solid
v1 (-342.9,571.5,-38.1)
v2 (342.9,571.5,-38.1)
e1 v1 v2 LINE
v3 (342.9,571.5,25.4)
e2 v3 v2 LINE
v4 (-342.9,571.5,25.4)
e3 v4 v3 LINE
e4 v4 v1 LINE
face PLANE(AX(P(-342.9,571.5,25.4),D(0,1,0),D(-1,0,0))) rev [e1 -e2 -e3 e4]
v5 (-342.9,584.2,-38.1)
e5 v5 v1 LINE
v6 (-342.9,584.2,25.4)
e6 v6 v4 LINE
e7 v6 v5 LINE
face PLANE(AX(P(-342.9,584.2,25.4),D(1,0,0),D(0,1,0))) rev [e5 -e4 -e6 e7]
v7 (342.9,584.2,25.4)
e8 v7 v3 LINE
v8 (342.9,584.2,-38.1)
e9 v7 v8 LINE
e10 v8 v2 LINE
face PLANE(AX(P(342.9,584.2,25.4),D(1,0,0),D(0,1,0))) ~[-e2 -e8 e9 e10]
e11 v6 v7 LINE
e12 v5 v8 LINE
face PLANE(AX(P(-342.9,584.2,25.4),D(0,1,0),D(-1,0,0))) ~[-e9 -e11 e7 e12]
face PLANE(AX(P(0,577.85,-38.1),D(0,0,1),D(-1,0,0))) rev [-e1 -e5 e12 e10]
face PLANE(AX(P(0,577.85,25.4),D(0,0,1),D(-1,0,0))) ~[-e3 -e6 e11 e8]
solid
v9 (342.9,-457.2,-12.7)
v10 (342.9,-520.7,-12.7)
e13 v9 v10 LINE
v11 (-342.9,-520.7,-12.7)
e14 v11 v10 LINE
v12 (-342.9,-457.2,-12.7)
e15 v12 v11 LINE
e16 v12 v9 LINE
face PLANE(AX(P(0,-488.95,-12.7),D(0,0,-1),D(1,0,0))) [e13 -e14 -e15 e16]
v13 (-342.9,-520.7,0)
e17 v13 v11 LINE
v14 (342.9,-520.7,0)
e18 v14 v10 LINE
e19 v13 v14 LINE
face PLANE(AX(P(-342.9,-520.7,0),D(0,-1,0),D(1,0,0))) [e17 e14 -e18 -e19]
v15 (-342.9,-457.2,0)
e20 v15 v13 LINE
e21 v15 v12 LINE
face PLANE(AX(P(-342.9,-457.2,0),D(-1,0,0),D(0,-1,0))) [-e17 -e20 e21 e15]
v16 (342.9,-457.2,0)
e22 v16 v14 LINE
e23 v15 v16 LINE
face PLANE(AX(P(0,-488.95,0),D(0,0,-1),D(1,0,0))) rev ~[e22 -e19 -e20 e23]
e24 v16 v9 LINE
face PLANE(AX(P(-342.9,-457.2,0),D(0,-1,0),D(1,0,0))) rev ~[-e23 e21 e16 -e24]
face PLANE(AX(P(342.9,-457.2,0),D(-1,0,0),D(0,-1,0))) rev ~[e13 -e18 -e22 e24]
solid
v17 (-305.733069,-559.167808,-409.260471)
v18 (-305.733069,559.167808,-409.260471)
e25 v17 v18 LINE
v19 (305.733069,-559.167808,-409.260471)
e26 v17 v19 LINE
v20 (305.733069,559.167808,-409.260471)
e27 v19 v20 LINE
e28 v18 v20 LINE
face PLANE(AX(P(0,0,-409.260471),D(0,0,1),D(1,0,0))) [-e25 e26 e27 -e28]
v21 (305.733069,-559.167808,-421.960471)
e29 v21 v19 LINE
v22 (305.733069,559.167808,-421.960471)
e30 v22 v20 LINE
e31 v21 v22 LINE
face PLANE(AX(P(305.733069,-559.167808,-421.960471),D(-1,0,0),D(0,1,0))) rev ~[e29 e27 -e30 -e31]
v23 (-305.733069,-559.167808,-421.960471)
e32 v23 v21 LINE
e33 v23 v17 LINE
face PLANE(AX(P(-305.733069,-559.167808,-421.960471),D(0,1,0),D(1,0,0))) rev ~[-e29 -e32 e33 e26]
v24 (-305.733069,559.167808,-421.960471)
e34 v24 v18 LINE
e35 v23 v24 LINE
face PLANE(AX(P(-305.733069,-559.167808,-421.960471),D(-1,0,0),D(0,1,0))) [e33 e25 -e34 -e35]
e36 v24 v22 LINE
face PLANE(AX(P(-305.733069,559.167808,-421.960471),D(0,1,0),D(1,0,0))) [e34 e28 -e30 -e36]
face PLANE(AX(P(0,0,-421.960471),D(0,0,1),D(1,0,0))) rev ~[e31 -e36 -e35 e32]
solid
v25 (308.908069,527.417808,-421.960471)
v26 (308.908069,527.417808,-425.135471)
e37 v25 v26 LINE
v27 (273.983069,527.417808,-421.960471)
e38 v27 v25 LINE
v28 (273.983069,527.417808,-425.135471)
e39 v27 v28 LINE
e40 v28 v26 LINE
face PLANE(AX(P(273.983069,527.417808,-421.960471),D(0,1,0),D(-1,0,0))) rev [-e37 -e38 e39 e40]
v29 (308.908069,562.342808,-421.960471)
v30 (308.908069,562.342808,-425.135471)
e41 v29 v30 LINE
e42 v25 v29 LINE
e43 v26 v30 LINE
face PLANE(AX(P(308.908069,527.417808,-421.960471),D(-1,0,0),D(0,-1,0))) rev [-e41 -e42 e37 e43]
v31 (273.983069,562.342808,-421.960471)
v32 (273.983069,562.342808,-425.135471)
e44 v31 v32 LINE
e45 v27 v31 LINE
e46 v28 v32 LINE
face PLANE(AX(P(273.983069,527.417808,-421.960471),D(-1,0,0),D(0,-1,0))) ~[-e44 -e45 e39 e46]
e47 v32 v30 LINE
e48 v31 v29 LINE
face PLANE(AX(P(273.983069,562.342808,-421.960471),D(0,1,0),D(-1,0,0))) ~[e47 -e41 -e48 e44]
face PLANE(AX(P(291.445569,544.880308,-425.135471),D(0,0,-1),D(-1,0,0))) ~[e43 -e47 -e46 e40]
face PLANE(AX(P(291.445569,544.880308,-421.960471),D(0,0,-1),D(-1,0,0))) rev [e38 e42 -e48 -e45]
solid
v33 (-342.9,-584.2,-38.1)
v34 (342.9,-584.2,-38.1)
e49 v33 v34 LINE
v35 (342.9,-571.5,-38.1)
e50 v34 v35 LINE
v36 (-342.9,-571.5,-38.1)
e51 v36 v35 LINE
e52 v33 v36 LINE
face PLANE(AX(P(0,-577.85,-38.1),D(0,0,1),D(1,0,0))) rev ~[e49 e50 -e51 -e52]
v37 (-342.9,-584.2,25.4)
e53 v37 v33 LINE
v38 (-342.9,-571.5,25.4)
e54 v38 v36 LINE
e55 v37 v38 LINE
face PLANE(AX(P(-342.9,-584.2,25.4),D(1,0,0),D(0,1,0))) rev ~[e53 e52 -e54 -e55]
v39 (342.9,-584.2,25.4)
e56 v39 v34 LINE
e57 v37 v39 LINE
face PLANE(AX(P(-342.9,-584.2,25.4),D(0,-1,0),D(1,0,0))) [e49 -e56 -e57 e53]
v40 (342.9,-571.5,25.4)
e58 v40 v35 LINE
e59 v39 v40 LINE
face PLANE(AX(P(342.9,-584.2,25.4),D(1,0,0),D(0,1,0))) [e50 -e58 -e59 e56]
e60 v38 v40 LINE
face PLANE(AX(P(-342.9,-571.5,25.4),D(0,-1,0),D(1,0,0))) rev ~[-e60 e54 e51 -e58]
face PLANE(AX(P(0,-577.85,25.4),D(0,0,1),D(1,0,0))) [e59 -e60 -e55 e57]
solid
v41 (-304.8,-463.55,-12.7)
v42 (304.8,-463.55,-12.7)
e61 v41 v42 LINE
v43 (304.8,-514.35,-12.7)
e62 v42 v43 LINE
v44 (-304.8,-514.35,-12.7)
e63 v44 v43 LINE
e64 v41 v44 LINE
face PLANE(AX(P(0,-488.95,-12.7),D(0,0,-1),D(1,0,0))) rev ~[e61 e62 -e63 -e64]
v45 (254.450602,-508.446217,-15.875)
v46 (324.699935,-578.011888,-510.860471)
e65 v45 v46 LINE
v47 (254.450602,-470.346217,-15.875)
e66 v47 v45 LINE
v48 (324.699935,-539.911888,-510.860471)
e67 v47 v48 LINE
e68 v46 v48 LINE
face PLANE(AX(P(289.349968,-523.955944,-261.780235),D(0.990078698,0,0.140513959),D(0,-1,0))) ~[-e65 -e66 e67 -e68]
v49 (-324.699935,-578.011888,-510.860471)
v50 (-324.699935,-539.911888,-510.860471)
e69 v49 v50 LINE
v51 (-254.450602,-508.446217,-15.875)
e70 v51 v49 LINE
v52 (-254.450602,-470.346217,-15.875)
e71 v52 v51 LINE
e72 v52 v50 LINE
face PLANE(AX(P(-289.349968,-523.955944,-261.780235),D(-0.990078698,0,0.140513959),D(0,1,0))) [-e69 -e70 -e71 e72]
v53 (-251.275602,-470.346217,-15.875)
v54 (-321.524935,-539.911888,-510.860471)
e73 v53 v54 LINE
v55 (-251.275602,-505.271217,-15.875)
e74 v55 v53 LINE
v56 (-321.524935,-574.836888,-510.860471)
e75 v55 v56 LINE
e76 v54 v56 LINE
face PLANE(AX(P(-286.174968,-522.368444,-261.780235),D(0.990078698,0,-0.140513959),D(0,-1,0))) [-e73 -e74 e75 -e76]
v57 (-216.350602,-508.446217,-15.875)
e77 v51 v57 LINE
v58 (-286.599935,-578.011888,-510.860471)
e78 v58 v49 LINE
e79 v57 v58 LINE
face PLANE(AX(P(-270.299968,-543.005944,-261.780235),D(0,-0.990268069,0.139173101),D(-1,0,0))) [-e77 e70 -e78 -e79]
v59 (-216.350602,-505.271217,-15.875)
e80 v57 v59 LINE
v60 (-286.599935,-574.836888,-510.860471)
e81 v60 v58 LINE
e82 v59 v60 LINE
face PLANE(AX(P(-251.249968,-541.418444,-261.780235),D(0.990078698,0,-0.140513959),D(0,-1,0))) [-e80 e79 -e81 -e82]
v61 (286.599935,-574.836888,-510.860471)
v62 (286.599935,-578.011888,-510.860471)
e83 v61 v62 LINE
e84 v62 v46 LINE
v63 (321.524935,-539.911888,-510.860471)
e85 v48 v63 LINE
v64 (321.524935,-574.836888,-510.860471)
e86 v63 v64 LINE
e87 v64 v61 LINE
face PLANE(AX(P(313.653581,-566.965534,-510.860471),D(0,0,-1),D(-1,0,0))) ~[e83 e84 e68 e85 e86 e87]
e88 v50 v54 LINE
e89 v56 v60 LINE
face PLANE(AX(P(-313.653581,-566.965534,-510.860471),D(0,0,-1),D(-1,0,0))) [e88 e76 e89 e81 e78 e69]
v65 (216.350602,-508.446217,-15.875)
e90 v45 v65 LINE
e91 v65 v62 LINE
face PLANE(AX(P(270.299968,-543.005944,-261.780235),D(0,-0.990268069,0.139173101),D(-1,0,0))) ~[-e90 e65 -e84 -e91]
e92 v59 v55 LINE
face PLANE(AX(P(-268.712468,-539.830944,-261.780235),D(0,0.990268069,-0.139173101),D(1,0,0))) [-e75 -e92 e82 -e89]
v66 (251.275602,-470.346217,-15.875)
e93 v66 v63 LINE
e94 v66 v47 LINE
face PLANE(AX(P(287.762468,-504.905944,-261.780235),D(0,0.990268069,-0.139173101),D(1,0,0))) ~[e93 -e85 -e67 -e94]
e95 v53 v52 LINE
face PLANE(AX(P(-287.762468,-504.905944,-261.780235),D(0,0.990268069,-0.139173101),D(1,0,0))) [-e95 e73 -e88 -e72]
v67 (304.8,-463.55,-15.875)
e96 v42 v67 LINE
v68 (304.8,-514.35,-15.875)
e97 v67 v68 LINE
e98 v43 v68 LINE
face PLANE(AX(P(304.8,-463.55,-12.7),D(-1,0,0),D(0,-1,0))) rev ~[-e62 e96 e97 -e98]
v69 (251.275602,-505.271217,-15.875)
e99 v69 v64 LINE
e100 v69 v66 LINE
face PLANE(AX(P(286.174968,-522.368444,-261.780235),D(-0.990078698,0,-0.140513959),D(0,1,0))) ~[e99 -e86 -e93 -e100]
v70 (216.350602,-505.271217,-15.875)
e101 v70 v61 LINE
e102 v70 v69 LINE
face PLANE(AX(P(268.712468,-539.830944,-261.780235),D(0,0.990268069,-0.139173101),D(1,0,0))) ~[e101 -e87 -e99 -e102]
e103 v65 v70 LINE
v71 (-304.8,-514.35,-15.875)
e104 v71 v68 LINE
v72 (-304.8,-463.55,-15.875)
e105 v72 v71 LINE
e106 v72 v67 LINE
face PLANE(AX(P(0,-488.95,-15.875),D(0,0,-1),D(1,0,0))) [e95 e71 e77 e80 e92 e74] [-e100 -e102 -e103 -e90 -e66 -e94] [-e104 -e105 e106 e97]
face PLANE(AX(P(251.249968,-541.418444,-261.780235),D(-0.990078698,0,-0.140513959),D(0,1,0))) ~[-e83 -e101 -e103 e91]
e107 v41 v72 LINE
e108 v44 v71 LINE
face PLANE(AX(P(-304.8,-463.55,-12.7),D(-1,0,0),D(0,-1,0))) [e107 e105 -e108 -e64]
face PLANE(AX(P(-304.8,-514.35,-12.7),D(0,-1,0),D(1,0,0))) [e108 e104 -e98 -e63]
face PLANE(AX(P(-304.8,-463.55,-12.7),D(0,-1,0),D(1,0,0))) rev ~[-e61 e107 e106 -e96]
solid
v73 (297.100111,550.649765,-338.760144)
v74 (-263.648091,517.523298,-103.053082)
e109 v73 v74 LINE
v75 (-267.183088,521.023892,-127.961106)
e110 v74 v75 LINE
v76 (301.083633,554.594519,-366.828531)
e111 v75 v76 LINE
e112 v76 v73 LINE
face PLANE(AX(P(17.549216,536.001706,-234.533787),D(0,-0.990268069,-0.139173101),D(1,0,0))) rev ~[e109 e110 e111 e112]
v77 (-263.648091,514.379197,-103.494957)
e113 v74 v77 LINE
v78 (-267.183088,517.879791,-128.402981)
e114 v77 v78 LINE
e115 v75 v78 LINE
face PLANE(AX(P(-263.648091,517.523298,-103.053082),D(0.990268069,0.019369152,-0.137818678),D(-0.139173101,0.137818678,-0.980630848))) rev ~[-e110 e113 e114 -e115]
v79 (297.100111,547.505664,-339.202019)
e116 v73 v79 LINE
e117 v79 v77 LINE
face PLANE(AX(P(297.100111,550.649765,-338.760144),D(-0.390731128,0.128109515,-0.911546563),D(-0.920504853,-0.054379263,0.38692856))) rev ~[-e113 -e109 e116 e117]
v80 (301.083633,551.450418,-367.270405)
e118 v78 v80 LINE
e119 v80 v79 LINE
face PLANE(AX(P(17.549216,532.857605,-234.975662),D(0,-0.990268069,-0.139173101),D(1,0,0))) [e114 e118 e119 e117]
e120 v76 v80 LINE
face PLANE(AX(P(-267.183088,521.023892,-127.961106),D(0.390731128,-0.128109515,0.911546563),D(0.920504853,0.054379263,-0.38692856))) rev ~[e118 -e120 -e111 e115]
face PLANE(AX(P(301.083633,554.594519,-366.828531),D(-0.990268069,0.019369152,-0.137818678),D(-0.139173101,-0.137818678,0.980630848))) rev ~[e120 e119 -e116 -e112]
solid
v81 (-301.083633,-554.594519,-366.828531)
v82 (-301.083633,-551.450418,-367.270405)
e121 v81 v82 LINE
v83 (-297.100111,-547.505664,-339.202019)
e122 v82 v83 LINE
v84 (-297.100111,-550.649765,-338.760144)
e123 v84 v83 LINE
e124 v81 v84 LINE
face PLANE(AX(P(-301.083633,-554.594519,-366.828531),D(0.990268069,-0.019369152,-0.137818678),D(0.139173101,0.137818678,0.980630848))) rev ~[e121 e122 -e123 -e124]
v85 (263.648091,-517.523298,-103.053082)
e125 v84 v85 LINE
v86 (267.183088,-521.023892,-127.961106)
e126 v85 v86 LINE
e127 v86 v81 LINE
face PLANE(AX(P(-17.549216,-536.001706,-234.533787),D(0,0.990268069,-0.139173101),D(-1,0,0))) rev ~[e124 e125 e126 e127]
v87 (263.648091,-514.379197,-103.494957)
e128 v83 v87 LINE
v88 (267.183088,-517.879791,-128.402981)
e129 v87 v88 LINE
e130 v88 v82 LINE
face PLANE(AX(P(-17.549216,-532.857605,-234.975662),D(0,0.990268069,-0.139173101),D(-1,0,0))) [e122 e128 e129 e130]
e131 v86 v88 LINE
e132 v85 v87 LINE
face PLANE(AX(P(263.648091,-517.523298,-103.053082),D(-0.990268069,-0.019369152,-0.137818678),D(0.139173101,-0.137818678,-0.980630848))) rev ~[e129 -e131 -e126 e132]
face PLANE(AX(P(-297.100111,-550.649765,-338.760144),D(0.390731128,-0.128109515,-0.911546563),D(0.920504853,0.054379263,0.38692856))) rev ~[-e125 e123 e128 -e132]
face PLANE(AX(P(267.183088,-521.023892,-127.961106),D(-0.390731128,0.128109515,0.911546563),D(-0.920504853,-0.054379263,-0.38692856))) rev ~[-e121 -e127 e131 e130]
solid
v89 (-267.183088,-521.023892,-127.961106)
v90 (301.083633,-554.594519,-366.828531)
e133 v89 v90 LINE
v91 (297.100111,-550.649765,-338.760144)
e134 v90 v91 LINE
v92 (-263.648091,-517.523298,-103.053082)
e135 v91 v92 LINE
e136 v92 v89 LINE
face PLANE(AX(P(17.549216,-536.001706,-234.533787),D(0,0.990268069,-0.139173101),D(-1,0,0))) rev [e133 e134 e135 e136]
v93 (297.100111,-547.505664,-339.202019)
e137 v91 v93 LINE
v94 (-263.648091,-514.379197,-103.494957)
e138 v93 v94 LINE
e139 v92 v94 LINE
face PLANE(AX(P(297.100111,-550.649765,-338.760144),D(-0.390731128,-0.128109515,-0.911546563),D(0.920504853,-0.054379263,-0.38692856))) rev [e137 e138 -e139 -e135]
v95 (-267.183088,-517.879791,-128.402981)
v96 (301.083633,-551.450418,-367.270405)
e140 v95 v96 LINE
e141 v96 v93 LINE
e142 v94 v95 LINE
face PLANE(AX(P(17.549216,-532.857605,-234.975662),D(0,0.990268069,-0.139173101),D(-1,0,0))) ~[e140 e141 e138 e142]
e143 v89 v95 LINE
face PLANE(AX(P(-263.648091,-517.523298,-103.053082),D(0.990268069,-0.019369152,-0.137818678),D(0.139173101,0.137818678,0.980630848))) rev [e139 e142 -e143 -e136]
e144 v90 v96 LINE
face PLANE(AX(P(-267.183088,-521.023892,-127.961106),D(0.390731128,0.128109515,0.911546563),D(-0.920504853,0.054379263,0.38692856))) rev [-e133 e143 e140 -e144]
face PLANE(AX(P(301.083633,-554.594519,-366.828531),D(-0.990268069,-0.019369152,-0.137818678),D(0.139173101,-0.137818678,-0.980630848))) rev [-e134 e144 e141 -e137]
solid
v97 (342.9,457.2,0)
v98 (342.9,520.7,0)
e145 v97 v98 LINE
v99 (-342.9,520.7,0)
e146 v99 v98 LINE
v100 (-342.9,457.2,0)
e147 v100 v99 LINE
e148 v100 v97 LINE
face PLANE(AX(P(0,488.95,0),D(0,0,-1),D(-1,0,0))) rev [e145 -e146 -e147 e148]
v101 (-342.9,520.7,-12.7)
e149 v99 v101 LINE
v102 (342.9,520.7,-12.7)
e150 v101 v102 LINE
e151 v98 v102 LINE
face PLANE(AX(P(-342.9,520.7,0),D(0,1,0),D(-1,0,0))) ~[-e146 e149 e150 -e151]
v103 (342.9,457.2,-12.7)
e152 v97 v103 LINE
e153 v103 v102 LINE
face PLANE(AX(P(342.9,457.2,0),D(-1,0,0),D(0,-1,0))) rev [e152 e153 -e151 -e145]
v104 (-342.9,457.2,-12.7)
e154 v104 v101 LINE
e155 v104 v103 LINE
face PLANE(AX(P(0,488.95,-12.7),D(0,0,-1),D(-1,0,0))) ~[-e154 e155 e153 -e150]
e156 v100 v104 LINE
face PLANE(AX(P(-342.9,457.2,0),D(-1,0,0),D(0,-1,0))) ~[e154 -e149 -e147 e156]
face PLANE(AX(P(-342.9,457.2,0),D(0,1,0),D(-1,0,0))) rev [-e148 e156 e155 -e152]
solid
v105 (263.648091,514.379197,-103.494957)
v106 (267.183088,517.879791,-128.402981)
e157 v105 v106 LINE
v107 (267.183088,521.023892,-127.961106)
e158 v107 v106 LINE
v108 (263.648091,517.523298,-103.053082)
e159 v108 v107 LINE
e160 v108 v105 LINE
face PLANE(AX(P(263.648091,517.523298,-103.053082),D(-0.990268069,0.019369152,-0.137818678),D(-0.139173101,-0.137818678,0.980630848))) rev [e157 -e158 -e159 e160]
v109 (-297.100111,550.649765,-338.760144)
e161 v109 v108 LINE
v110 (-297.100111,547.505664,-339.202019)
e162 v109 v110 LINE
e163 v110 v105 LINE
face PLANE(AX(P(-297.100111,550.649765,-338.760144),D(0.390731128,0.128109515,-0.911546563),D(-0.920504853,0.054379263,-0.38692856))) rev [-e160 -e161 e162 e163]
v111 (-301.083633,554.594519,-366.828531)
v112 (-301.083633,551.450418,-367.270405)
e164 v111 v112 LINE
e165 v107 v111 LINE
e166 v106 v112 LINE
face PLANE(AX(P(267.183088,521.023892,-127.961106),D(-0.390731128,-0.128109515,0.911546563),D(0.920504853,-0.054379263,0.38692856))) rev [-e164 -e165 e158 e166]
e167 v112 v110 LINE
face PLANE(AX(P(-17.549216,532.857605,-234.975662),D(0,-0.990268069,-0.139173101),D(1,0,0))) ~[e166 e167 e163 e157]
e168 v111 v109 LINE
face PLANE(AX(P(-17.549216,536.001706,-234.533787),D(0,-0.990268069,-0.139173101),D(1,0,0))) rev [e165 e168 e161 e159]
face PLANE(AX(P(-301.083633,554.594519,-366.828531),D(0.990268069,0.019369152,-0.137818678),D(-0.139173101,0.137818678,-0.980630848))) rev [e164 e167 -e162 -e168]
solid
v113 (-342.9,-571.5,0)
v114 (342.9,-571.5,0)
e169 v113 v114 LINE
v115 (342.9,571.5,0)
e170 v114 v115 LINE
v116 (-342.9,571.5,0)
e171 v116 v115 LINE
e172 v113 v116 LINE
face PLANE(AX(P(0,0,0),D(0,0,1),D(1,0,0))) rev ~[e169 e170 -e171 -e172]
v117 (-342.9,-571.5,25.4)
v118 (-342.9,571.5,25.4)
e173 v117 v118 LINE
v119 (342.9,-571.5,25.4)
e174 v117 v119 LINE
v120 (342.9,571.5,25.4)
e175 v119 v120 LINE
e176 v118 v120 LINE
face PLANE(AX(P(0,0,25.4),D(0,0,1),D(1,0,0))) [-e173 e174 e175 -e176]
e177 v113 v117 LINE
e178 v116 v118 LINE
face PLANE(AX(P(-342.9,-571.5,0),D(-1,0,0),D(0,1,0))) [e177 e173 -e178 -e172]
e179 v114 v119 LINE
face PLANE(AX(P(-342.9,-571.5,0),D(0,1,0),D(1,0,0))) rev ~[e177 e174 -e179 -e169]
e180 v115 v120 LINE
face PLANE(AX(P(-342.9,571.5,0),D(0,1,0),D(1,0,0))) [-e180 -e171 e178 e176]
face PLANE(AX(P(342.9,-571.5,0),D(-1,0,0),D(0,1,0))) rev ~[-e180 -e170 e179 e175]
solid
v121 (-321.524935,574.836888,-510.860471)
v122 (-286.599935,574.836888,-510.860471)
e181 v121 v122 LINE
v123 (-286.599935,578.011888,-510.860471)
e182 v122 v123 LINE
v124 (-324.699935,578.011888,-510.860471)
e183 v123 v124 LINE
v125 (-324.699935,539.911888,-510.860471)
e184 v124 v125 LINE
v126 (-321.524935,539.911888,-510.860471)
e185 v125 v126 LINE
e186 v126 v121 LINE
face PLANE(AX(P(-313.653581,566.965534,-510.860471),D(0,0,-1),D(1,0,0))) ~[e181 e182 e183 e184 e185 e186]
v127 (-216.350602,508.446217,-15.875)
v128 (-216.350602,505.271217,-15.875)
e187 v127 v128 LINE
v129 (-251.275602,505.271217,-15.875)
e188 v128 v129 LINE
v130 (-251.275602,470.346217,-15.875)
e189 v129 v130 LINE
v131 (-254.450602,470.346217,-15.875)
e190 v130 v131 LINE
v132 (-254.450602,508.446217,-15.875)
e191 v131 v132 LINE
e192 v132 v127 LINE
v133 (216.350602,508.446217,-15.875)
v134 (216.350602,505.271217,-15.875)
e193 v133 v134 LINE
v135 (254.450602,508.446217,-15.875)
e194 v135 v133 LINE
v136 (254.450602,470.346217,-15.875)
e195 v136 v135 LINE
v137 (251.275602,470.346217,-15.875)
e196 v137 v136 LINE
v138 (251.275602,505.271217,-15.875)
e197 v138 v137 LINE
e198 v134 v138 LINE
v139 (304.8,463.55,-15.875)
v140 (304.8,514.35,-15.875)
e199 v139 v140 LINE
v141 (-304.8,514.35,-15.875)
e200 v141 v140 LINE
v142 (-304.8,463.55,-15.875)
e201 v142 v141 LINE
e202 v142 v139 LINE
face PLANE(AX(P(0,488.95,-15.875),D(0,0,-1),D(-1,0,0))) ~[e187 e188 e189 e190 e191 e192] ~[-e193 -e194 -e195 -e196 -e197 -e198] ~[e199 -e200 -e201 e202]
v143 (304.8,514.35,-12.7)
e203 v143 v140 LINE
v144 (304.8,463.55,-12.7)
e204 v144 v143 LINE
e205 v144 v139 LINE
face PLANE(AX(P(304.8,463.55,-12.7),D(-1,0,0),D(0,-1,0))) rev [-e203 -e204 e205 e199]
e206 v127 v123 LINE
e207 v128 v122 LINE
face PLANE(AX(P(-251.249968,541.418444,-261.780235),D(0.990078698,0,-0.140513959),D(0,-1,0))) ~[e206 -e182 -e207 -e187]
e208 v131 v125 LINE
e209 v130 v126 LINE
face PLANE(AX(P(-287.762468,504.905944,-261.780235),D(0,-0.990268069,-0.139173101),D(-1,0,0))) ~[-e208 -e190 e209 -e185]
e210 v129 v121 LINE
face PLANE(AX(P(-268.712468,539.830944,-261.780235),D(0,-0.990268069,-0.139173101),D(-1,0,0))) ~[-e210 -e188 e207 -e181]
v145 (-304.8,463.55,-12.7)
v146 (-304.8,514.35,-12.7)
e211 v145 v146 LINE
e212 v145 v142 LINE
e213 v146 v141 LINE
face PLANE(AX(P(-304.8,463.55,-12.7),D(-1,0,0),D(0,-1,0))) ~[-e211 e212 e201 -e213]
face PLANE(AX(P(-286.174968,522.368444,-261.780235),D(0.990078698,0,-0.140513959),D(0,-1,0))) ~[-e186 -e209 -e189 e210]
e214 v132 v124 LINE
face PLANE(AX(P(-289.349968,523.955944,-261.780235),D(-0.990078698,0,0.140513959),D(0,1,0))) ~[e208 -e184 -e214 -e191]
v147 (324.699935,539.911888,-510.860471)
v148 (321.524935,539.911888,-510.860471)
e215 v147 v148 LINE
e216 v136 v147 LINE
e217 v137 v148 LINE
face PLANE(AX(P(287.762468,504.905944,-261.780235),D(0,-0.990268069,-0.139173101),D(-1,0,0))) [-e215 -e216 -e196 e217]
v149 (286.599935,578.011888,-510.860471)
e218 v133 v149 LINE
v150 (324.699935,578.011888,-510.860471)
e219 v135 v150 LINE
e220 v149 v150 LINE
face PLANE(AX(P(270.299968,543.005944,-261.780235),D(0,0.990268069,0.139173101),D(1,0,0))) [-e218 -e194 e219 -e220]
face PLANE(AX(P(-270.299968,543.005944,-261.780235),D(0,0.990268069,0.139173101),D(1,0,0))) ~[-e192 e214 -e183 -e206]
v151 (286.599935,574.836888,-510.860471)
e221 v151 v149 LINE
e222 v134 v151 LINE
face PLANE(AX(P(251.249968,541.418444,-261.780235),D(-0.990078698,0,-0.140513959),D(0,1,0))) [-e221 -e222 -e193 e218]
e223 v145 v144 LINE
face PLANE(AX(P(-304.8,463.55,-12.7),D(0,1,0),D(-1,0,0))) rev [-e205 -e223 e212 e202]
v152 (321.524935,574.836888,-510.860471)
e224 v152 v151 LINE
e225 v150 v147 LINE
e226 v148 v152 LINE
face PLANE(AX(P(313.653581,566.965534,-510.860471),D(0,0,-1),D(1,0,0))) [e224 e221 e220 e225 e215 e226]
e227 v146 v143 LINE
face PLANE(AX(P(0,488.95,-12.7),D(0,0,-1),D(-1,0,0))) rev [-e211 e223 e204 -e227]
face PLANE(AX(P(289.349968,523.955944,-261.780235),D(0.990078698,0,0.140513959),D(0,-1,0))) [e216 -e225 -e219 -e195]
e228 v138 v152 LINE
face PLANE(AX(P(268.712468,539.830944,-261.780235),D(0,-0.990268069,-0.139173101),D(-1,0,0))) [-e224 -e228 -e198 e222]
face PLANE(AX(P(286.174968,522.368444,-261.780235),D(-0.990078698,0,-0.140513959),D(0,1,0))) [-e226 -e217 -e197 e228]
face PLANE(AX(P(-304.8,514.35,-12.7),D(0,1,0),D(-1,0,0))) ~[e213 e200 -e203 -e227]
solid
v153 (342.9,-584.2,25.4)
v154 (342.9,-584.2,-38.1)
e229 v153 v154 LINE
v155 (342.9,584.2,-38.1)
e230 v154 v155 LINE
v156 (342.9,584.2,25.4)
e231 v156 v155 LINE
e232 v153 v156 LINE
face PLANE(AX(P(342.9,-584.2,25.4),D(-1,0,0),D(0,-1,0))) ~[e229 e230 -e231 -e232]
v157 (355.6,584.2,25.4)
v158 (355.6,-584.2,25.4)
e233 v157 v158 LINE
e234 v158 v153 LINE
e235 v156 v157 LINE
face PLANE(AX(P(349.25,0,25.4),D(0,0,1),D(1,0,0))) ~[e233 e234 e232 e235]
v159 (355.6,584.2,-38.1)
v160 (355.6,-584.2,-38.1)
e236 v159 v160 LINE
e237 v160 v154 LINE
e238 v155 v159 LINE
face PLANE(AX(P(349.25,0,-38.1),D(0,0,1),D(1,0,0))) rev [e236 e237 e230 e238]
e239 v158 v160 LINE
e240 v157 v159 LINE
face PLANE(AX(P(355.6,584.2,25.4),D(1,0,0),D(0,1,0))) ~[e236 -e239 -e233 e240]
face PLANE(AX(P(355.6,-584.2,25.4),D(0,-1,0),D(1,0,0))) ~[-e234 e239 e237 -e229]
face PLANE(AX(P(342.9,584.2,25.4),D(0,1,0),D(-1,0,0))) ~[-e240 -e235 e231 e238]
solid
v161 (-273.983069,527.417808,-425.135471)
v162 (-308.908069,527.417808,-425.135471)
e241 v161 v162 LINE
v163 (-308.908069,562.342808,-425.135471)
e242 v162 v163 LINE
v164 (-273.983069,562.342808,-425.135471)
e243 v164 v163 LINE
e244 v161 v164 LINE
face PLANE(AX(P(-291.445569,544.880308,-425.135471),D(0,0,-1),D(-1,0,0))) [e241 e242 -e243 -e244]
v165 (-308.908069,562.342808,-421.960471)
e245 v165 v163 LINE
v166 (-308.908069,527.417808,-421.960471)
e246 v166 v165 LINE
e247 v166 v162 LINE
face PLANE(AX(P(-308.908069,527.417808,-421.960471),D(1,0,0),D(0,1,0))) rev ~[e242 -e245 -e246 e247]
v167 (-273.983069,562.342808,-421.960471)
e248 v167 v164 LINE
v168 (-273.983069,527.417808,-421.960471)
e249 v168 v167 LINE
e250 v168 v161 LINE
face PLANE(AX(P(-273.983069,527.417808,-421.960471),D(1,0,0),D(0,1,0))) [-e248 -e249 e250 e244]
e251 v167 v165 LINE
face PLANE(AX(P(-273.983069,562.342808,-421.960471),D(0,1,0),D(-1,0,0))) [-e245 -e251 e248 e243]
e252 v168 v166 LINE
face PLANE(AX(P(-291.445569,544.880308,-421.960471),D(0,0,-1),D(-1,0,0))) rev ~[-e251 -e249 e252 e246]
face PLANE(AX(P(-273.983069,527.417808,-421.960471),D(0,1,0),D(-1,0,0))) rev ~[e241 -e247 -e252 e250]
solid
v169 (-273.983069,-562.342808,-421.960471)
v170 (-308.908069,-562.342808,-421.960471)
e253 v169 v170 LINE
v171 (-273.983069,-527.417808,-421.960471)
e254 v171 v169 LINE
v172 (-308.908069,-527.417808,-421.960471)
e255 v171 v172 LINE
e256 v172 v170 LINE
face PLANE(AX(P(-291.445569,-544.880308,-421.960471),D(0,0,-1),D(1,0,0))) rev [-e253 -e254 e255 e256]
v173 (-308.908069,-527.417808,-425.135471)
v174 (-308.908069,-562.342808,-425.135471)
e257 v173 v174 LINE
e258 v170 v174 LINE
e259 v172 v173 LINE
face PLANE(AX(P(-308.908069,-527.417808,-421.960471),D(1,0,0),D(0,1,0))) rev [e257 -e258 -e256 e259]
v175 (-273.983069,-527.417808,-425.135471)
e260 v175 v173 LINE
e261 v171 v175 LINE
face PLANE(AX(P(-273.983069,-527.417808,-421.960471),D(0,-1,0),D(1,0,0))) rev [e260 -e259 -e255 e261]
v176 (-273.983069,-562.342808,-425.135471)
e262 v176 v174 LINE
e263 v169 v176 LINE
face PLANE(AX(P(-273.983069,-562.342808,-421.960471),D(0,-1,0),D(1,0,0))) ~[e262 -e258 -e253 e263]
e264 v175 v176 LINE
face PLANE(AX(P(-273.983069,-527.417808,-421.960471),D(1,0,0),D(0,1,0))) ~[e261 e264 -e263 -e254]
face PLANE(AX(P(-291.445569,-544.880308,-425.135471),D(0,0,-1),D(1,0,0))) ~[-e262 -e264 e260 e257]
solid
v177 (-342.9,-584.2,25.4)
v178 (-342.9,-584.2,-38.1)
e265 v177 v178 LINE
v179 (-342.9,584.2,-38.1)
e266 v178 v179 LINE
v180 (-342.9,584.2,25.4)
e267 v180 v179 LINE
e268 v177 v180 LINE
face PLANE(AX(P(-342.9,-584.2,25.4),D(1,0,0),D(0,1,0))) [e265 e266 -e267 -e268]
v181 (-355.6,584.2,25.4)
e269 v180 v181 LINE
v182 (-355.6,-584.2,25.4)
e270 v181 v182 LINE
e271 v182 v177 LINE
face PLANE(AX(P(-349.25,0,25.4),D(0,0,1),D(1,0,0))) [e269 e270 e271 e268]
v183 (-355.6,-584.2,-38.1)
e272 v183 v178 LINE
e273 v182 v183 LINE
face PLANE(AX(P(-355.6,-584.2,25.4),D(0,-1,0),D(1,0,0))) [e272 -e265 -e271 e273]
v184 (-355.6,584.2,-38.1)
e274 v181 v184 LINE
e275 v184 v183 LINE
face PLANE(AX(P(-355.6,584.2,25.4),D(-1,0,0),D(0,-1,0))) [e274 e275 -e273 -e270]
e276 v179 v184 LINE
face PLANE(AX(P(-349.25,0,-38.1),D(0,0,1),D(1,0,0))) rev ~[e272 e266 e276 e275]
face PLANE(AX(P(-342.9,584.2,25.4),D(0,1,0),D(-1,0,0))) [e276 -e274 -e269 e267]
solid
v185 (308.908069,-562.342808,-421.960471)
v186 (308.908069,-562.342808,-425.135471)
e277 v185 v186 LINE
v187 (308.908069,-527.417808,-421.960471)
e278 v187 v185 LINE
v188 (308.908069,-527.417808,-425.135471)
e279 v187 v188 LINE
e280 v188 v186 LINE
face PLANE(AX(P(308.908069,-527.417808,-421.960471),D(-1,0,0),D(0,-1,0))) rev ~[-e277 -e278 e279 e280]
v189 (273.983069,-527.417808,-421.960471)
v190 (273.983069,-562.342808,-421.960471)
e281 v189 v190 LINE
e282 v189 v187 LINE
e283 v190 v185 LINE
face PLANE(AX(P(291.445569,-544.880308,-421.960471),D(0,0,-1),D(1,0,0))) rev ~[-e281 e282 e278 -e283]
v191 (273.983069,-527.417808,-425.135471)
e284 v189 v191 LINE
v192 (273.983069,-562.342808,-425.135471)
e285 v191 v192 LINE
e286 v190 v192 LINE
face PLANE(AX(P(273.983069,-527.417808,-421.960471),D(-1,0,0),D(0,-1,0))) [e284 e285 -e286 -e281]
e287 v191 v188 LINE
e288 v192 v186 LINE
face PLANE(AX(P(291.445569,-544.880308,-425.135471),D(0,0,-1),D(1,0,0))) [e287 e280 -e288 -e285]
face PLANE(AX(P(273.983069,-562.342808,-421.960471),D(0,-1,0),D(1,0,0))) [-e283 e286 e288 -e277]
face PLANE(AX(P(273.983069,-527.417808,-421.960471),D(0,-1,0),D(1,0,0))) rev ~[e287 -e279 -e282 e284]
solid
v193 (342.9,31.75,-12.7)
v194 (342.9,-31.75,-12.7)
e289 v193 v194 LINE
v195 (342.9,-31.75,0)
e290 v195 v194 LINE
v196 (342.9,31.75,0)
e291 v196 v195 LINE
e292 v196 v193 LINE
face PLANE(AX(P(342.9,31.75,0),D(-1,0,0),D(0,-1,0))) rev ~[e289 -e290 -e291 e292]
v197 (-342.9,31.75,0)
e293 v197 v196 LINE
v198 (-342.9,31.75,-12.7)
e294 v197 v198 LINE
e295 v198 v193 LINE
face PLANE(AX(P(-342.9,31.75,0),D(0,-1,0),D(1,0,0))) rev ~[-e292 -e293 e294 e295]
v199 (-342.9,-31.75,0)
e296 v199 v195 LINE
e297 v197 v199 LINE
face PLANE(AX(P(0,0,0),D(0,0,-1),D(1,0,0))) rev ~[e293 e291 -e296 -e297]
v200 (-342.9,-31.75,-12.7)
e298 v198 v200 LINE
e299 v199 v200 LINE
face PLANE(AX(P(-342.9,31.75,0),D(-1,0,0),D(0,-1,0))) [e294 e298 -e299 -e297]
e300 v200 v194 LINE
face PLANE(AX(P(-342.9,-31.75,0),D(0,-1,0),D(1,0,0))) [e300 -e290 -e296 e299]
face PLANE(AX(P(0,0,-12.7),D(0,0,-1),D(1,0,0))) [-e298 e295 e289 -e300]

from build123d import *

# Parameters (mm, degrees)
F0_W      = 685.8
F0_H      = 1143
F1_DEPTH  = 25.4
F2_W      = 685.8
F2_H      = 12.7
F3_DEPTH  = 63.5
F4_DEPTH  = 63.5
F7_W      = 685.8
F7_H      = 63.5
F8_DEPTH  = 12.7
F13_W     = 609.6
F13_H     = 50.8
F14_DEPTH = 3.175
F18_DEPTH = 3.175
F21_W     = 34.925
F21_H     = 34.925
F22_DEPTH = 3.175
F25_W     = 611.4661372068
F25_H     = 1118.335616345
F26_DEPTH = 12.7


# Not quite as in the source:
# - a feature of the source that left no trace in its solid (it failed there, or was rolled back) is left out


with BuildPart() as f1:
    # F0 (on Top) → F1 (new body)
    with BuildSketch(Plane.XY):
        Rectangle(F0_W, F0_H)
    extrude(amount=F1_DEPTH)


with BuildPart() as f3:
    # F2 (on face) → F3 (new body)
    with BuildSketch(Plane.XY.offset(25.4)):
        with Locations((0, -577.85)):
            Rectangle(F2_W, F2_H)
    extrude(amount=-F3_DEPTH)


with BuildPart() as f4:
    # F2 (on face) → F4 (new body)
    with BuildSketch(Plane.XY.offset(25.4)):
        Polygon((-342.9, -584.2), (-342.9, -571.5), (-342.9, 571.5), (-342.9, 584.2), (-355.6, 584.2), (-355.6, -584.2), align=None)
    extrude(amount=-F4_DEPTH)


with BuildPart() as f5_1:
    # F5: instance of F4
    add(f4.part.mirror(Plane.YZ))


with BuildPart() as f6_1:
    # F6: instance of F3
    add(f3.part.mirror(Plane.XZ))


with BuildPart() as f8:
    # F7 (on face) → F8 (new body)
    with BuildSketch(Plane(origin=(0, 0, 0), x_dir=(1, 0, 0), z_dir=(0, 0, -1))):
        with Locations((0, 488.95)):
            Rectangle(F7_W, F7_H)
    extrude(amount=F8_DEPTH)


with BuildPart() as f8b:
    # F7 (on face) → F8, piece 2 (new body)
    with BuildSketch(Plane(origin=(0, 0, 0), x_dir=(1, 0, 0), z_dir=(0, 0, -1))):
        Rectangle(F7_W, F7_H)
    extrude(amount=F8_DEPTH)


with BuildPart() as f12:
    # F12: sweep along a path in F11
    with BuildLine(Plane(origin=(0, -496.4101735589, 69.7659001467), x_dir=(1, 0, 0), z_dir=(0, -0.9902680687, 0.139173101))) as f12_path:
        Line((-254, -83.2763397607), (-324.6999352877, -586.3325186814))
    # F9 (on face) → F12 (sweep)
    with BuildSketch(Plane(origin=(0, 0, -12.7), x_dir=(1, 0, 0), z_dir=(0, 0, -1))):
        Polygon((-254, 508), (-254, 469.9), (-250.825, 469.9), (-250.825, 504.825), (-215.9, 504.825), (-215.9, 508), align=None)
    sweep(path=f12_path.line)

    # F13 (on face) → F14 (join)
    with BuildSketch(Plane(origin=(0, 0, -12.7), x_dir=(1, 0, 0), z_dir=(0, 0, -1))):
        with Locations((0, 488.95)):
            Rectangle(F13_W, F13_H)
    extrude(amount=F14_DEPTH)

    # F16: F12 across plane


with BuildPart() as f12_1:
    add(f12.part)
    add(f12.part.mirror(Plane.YZ))


with BuildPart() as f18:
    # F17 (on face) → F18 (new body)
    with BuildSketch(Plane(origin=(0, -493.2966706166, 69.3283258444), x_dir=(-1, 0, 0), z_dir=(0, 0.9902680687, -0.139173101))):
        Polygon((297.1001110228, -412.0989890367), (-263.6480910569, -174.0754990191), (-267.1830878213, -199.2283079651), (301.0836328718, -440.4432197893), align=None)
    extrude(amount=F18_DEPTH)


with BuildPart() as f19_1:
    # F19: instance of F18
    add(f18.part.mirror(Plane.YZ))


with BuildPart() as f22:
    # F21 (on offset) → F22 (new body)
    with BuildSketch(Plane(origin=(0, 0, -421.9604707683), x_dir=(1, 0, 0), z_dir=(0, 0, -1))):
        with Locations((291.4455686034, 544.8803081725)):
            Rectangle(F21_W, F21_H)
    extrude(amount=F22_DEPTH)


with BuildPart() as f23_1:
    # F23: instance of F22
    add(f22.part.mirror(Plane.YZ))


with BuildPart() as f24_1:
    # F24: instance of F8
    add(f8.part.mirror(Plane.XZ))


with BuildPart() as f24_2:
    # F24: instance of F12
    add(f12_1.part.mirror(Plane.XZ))


with BuildPart() as f24_3:
    # F24: instance of F19_1
    add(f19_1.part.mirror(Plane.XZ))


with BuildPart() as f24_4:
    # F24: instance of F18
    add(f18.part.mirror(Plane.XZ))


with BuildPart() as f24_5:
    # F24: instance of F23_1
    add(f23_1.part.mirror(Plane.XZ))


with BuildPart() as f24_6:
    # F24: instance of F22
    add(f22.part.mirror(Plane.XZ))


with BuildPart() as f26:
    # F25 (on face) → F26 (new body)
    with BuildSketch(Plane.XY.offset(-421.9604707683)):
        Rectangle(F25_W, F25_H)
    extrude(amount=F26_DEPTH)


solid = Compound([f1.part, f3.part, f4.part, f5_1.part, f6_1.part, f8.part, f8b.part, f12_1.part, f18.part, f19_1.part, f22.part, f23_1.part, f24_1.part, f24_2.part, f24_3.part, f24_4.part, f24_5.part, f24_6.part, f26.part])
